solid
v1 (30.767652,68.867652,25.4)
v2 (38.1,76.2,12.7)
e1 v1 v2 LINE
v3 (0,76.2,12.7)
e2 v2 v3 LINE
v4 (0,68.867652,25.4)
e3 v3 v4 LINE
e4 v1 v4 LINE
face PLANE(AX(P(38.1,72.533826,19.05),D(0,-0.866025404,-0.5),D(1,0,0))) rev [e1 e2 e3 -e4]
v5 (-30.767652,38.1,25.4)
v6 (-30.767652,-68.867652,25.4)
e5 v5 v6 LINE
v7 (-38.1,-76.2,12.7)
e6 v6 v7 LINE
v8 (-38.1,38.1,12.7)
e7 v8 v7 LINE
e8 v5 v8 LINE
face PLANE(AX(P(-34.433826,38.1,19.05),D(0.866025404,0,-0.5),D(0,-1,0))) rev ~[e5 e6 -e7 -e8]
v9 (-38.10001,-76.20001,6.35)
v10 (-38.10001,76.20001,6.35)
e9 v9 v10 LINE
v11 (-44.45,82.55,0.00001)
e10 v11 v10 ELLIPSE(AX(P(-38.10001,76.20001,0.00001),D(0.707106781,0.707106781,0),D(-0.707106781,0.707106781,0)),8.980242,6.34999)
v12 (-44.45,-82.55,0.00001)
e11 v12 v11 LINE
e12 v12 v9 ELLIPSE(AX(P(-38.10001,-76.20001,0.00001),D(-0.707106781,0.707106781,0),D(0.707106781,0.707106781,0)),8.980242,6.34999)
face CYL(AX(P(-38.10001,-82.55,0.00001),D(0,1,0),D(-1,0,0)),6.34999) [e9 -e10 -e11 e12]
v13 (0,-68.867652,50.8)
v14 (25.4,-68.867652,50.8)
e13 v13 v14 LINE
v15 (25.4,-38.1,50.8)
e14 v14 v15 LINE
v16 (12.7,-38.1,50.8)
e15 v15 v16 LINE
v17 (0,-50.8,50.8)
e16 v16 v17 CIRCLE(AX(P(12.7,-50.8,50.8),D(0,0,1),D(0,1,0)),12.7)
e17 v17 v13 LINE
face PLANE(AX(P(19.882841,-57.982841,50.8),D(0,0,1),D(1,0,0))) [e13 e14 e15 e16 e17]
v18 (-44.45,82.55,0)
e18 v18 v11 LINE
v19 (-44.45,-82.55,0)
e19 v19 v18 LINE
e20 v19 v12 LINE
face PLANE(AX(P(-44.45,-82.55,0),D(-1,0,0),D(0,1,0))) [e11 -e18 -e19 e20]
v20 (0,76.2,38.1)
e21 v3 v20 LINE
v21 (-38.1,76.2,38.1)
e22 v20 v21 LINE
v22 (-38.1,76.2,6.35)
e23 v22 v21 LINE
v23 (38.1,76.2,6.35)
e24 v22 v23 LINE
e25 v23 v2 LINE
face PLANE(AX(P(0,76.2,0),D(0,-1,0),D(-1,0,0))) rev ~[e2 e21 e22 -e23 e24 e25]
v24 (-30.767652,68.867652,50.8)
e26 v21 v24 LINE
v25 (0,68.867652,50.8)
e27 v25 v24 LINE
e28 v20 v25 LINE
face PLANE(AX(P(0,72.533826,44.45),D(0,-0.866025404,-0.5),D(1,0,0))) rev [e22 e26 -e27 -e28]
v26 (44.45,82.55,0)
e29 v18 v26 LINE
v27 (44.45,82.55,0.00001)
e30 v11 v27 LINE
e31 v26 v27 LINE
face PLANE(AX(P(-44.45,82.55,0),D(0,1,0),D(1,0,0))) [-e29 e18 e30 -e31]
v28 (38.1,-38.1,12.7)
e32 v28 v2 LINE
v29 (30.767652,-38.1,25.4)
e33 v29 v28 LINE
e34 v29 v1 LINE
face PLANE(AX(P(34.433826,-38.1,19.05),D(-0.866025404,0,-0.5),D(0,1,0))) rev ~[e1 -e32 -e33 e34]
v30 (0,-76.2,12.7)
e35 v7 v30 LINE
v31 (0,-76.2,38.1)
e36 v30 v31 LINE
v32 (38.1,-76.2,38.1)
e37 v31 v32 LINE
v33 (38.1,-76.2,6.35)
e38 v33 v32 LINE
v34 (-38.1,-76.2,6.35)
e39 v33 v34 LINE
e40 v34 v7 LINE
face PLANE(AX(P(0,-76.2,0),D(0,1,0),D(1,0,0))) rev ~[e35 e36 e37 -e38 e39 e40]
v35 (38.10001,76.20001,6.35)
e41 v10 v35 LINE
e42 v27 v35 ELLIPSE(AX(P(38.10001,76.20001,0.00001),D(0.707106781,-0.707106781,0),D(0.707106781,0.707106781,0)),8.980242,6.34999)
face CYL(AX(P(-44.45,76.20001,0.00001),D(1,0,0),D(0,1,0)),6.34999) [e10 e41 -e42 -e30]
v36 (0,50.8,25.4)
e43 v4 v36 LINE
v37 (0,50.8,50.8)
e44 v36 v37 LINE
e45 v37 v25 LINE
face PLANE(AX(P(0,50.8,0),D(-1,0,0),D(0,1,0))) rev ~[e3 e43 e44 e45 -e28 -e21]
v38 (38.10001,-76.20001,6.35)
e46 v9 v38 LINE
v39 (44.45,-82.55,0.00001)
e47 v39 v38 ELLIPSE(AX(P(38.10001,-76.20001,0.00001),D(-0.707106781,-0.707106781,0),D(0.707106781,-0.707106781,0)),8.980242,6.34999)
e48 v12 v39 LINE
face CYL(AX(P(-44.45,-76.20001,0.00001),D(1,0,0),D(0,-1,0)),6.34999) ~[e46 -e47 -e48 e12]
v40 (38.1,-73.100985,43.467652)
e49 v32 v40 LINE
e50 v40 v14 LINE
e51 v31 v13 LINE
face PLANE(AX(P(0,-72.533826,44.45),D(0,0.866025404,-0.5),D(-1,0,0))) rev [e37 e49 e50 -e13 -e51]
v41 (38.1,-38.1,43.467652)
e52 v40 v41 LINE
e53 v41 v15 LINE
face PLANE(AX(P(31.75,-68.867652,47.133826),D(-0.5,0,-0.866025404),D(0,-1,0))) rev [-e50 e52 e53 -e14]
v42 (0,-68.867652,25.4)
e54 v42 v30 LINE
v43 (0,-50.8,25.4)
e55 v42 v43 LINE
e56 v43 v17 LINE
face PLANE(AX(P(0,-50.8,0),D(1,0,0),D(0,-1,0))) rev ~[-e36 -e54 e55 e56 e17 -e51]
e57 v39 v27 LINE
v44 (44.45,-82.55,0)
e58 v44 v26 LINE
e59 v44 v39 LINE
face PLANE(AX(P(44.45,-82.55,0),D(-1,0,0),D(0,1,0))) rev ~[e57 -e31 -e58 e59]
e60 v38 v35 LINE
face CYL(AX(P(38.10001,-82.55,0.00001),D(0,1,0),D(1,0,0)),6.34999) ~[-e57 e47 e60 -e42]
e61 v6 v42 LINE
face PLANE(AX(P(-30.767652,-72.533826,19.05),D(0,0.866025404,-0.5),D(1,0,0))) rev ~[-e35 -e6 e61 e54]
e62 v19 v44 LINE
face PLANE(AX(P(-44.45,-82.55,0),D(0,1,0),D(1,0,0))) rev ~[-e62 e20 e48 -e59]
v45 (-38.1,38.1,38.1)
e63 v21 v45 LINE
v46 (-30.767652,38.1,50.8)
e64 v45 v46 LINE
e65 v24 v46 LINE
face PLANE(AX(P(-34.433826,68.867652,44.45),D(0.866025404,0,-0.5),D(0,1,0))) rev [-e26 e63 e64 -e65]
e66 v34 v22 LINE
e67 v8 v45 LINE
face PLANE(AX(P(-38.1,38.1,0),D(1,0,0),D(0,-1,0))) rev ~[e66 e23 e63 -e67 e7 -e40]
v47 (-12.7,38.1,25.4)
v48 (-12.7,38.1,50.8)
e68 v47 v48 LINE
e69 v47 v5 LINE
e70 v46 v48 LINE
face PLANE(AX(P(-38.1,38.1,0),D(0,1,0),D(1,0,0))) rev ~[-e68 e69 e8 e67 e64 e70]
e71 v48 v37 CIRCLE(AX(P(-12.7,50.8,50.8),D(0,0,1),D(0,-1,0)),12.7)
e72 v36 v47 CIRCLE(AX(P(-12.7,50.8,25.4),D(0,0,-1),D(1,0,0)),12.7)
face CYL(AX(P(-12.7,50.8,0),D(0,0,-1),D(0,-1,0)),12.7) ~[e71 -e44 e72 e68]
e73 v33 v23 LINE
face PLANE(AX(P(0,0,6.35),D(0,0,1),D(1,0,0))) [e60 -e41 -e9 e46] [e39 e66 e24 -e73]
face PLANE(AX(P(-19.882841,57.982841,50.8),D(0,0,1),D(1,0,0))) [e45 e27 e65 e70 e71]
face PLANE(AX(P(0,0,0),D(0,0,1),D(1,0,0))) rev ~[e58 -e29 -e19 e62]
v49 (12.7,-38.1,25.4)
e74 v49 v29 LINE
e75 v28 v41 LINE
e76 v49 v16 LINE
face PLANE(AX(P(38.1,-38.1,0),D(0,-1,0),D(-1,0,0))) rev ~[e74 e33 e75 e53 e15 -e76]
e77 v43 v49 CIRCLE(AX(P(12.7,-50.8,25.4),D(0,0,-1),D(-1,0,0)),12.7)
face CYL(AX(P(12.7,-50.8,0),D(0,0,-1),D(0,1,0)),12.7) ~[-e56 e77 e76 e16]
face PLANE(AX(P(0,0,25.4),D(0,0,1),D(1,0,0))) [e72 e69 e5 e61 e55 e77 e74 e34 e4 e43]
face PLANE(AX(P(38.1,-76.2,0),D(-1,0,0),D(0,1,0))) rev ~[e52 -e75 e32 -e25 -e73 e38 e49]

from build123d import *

# Parameters (mm, degrees)
F0_W        = 88.9
F0_H        = 165.1
F1_DEPTH    = 6.35
F2_R        = 6.34999
F3_DEPTH    = 25.4
F4_DEPTH    = 50.8
F5_C1_SIZE2 = 7.3323484187
F5_C1_SIZE  = 12.7
F5_C2_SIZE2 = 12.7
F5_C2_SIZE  = 7.3323484187
F5_C3_SIZE2 = 7.3323484187
F5_C3_SIZE  = 12.7
F5_C4_SIZE2 = 7.3323484187
F5_C4_SIZE  = 12.7
F6_C1_SIZE2 = 7.3323484187
F6_C1_SIZE  = 12.7
F6_C2_SIZE2 = 12.7
F6_C2_SIZE  = 7.3323484187
F6_C3_SIZE2 = 12.7
F6_C3_SIZE  = 7.3323484187
F6_C4_SIZE2 = 12.7
F6_C4_SIZE  = 7.3323484187


# Not quite as in the source:
# - a fillet or chamfer is up to 0.001 mm smaller than in the source, because OpenCascade refuses the exact size


with BuildPart() as f1:
    # F0 (on Top) → F1 (new body)
    with BuildSketch(Plane.XY):
        Rectangle(F0_W, F0_H)
        Polygon((-38.1, 38.1), (-38.1, 76.2), (0, 76.2), (38.1, 76.2), (38.1, -38.1), (38.1, -76.2), (0, -76.2), (-38.1, -76.2), align=None, mode=Mode.SUBTRACT)
    extrude(amount=F1_DEPTH)

    # F2 (radius 6.35 in the source; OpenCascade refuses exactly that, so slightly less here)
    f2_edges = [f1.edges().sort_by_distance(p)[0] for p in [
        (-44.45, 0, 6.35),
        (0, -82.55, 6.35),
        (44.45, 0, 6.35),
        (0, 82.55, 6.35),
    ]]
    fillet(f2_edges, radius=F2_R)

    # F0 (on Top) → F3 (join)
    with BuildSketch(Plane.XY):
        with BuildLine():
            Line((38.1, 76.2), (0, 76.2))
            Line((0, 76.2), (0, 50.8))
            ThreePointArc((0, 50.8), (-3.7197438789, 41.8197438789), (-12.7, 38.1))
            Line((-12.7, 38.1), (-38.1, 38.1))
            Line((-38.1, 38.1), (-38.1, -76.2))
            Line((-38.1, -76.2), (0, -76.2))
            Line((0, -76.2), (0, -50.8))
            ThreePointArc((0, -50.8), (3.7197438789, -41.8197438789), (12.7, -38.1))
            Line((12.7, -38.1), (38.1, -38.1))
            Line((38.1, -38.1), (38.1, 76.2))
        make_face()
    extrude(amount=F3_DEPTH)

    # F0 (on Top) → F4 (join)
    with BuildSketch(Plane.XY):
        with BuildLine():
            Line((38.1, -76.2), (38.1, -38.1))
            Line((38.1, -38.1), (12.7, -38.1))
            ThreePointArc((12.7, -38.1), (3.7197438789, -41.8197438789), (0, -50.8))
            Line((0, -50.8), (0, -76.2))
            Line((0, -76.2), (38.1, -76.2))
        make_face()
        with BuildLine():
            Line((0, 76.2), (-38.1, 76.2))
            Line((-38.1, 76.2), (-38.1, 38.1))
            Line((-38.1, 38.1), (-12.7, 38.1))
            ThreePointArc((-12.7, 38.1), (-3.7197438789, 41.8197438789), (0, 50.8))
            Line((0, 50.8), (0, 76.2))
        make_face()
    extrude(amount=F4_DEPTH)

    # F5: chamfer of 12.7 x 7.3323484187 on 4 edges, made by hand

    # F5_c1
    f5_c1_edges = [f1.edges().sort_by_distance(p)[0] for p in [
        (19.05, -76.2, 50.8),
    ]]
    f5_c1_side = f1.faces().sort_by_distance((19.05, -76.2, 50.6533530316))[0]
    chamfer(f5_c1_edges, length=F5_C1_SIZE, length2=F5_C1_SIZE2, reference=f5_c1_side)

    # F5_c2
    f5_c2_edges = [f1.edges().sort_by_distance(p)[0] for p in [
        (38.1, -53.4838257906, 50.8),
    ]]
    f5_c2_side = f1.faces().sort_by_distance((38.1, -53.4838257906, 50.6533530316))[0]
    chamfer(f5_c2_edges, length=F5_C2_SIZE, length2=F5_C2_SIZE2, reference=f5_c2_side)

    # F5_c3
    f5_c3_edges = [f1.edges().sort_by_distance(p)[0] for p in [
        (-19.05, 76.2, 50.8),
    ]]
    f5_c3_side = f1.faces().sort_by_distance((-19.05, 76.2, 50.6533530316))[0]
    chamfer(f5_c3_edges, length=F5_C3_SIZE, length2=F5_C3_SIZE2, reference=f5_c3_side)

    # F5_c4
    f5_c4_edges = [f1.edges().sort_by_distance(p)[0] for p in [
        (-38.1, 53.4838257906, 50.8),
    ]]
    f5_c4_side = f1.faces().sort_by_distance((-38.1, 53.4838257906, 50.6533530316))[0]
    chamfer(f5_c4_edges, length=F5_C4_SIZE, length2=F5_C4_SIZE2, reference=f5_c4_side)

    # F6: chamfer of 12.7 x 7.3323484187 on 4 edges, made by hand

    # F6_c1
    f6_c1_edges = [f1.edges().sort_by_distance(p)[0] for p in [
        (19.05, 76.2, 25.4),
    ]]
    f6_c1_side = f1.faces().sort_by_distance((19.05, 76.2, 25.2533530316))[0]
    chamfer(f6_c1_edges, length=F6_C1_SIZE, length2=F6_C1_SIZE2, reference=f6_c1_side)

    # F6_c2
    f6_c2_edges = [f1.edges().sort_by_distance(p)[0] for p in [
        (-38.1, -19.05, 25.4),
    ]]
    f6_c2_side = f1.faces().sort_by_distance((-37.9533530316, -19.05, 25.4))[0]
    chamfer(f6_c2_edges, length=F6_C2_SIZE, length2=F6_C2_SIZE2, reference=f6_c2_side)

    # F6_c3
    f6_c3_edges = [f1.edges().sort_by_distance(p)[0] for p in [
        (38.1, 15.3838257906, 25.4),
    ]]
    f6_c3_side = f1.faces().sort_by_distance((37.9533530316, 15.3838257906, 25.4))[0]
    chamfer(f6_c3_edges, length=F6_C3_SIZE, length2=F6_C3_SIZE2, reference=f6_c3_side)

    # F6_c4
    f6_c4_edges = [f1.edges().sort_by_distance(p)[0] for p in [
        (-15.3838257906, -76.2, 25.4),
    ]]
    f6_c4_side = f1.faces().sort_by_distance((-15.3838257906, -76.0533530316, 25.4))[0]
    chamfer(f6_c4_edges, length=F6_C4_SIZE, length2=F6_C4_SIZE2, reference=f6_c4_side)


solid = f1.part
